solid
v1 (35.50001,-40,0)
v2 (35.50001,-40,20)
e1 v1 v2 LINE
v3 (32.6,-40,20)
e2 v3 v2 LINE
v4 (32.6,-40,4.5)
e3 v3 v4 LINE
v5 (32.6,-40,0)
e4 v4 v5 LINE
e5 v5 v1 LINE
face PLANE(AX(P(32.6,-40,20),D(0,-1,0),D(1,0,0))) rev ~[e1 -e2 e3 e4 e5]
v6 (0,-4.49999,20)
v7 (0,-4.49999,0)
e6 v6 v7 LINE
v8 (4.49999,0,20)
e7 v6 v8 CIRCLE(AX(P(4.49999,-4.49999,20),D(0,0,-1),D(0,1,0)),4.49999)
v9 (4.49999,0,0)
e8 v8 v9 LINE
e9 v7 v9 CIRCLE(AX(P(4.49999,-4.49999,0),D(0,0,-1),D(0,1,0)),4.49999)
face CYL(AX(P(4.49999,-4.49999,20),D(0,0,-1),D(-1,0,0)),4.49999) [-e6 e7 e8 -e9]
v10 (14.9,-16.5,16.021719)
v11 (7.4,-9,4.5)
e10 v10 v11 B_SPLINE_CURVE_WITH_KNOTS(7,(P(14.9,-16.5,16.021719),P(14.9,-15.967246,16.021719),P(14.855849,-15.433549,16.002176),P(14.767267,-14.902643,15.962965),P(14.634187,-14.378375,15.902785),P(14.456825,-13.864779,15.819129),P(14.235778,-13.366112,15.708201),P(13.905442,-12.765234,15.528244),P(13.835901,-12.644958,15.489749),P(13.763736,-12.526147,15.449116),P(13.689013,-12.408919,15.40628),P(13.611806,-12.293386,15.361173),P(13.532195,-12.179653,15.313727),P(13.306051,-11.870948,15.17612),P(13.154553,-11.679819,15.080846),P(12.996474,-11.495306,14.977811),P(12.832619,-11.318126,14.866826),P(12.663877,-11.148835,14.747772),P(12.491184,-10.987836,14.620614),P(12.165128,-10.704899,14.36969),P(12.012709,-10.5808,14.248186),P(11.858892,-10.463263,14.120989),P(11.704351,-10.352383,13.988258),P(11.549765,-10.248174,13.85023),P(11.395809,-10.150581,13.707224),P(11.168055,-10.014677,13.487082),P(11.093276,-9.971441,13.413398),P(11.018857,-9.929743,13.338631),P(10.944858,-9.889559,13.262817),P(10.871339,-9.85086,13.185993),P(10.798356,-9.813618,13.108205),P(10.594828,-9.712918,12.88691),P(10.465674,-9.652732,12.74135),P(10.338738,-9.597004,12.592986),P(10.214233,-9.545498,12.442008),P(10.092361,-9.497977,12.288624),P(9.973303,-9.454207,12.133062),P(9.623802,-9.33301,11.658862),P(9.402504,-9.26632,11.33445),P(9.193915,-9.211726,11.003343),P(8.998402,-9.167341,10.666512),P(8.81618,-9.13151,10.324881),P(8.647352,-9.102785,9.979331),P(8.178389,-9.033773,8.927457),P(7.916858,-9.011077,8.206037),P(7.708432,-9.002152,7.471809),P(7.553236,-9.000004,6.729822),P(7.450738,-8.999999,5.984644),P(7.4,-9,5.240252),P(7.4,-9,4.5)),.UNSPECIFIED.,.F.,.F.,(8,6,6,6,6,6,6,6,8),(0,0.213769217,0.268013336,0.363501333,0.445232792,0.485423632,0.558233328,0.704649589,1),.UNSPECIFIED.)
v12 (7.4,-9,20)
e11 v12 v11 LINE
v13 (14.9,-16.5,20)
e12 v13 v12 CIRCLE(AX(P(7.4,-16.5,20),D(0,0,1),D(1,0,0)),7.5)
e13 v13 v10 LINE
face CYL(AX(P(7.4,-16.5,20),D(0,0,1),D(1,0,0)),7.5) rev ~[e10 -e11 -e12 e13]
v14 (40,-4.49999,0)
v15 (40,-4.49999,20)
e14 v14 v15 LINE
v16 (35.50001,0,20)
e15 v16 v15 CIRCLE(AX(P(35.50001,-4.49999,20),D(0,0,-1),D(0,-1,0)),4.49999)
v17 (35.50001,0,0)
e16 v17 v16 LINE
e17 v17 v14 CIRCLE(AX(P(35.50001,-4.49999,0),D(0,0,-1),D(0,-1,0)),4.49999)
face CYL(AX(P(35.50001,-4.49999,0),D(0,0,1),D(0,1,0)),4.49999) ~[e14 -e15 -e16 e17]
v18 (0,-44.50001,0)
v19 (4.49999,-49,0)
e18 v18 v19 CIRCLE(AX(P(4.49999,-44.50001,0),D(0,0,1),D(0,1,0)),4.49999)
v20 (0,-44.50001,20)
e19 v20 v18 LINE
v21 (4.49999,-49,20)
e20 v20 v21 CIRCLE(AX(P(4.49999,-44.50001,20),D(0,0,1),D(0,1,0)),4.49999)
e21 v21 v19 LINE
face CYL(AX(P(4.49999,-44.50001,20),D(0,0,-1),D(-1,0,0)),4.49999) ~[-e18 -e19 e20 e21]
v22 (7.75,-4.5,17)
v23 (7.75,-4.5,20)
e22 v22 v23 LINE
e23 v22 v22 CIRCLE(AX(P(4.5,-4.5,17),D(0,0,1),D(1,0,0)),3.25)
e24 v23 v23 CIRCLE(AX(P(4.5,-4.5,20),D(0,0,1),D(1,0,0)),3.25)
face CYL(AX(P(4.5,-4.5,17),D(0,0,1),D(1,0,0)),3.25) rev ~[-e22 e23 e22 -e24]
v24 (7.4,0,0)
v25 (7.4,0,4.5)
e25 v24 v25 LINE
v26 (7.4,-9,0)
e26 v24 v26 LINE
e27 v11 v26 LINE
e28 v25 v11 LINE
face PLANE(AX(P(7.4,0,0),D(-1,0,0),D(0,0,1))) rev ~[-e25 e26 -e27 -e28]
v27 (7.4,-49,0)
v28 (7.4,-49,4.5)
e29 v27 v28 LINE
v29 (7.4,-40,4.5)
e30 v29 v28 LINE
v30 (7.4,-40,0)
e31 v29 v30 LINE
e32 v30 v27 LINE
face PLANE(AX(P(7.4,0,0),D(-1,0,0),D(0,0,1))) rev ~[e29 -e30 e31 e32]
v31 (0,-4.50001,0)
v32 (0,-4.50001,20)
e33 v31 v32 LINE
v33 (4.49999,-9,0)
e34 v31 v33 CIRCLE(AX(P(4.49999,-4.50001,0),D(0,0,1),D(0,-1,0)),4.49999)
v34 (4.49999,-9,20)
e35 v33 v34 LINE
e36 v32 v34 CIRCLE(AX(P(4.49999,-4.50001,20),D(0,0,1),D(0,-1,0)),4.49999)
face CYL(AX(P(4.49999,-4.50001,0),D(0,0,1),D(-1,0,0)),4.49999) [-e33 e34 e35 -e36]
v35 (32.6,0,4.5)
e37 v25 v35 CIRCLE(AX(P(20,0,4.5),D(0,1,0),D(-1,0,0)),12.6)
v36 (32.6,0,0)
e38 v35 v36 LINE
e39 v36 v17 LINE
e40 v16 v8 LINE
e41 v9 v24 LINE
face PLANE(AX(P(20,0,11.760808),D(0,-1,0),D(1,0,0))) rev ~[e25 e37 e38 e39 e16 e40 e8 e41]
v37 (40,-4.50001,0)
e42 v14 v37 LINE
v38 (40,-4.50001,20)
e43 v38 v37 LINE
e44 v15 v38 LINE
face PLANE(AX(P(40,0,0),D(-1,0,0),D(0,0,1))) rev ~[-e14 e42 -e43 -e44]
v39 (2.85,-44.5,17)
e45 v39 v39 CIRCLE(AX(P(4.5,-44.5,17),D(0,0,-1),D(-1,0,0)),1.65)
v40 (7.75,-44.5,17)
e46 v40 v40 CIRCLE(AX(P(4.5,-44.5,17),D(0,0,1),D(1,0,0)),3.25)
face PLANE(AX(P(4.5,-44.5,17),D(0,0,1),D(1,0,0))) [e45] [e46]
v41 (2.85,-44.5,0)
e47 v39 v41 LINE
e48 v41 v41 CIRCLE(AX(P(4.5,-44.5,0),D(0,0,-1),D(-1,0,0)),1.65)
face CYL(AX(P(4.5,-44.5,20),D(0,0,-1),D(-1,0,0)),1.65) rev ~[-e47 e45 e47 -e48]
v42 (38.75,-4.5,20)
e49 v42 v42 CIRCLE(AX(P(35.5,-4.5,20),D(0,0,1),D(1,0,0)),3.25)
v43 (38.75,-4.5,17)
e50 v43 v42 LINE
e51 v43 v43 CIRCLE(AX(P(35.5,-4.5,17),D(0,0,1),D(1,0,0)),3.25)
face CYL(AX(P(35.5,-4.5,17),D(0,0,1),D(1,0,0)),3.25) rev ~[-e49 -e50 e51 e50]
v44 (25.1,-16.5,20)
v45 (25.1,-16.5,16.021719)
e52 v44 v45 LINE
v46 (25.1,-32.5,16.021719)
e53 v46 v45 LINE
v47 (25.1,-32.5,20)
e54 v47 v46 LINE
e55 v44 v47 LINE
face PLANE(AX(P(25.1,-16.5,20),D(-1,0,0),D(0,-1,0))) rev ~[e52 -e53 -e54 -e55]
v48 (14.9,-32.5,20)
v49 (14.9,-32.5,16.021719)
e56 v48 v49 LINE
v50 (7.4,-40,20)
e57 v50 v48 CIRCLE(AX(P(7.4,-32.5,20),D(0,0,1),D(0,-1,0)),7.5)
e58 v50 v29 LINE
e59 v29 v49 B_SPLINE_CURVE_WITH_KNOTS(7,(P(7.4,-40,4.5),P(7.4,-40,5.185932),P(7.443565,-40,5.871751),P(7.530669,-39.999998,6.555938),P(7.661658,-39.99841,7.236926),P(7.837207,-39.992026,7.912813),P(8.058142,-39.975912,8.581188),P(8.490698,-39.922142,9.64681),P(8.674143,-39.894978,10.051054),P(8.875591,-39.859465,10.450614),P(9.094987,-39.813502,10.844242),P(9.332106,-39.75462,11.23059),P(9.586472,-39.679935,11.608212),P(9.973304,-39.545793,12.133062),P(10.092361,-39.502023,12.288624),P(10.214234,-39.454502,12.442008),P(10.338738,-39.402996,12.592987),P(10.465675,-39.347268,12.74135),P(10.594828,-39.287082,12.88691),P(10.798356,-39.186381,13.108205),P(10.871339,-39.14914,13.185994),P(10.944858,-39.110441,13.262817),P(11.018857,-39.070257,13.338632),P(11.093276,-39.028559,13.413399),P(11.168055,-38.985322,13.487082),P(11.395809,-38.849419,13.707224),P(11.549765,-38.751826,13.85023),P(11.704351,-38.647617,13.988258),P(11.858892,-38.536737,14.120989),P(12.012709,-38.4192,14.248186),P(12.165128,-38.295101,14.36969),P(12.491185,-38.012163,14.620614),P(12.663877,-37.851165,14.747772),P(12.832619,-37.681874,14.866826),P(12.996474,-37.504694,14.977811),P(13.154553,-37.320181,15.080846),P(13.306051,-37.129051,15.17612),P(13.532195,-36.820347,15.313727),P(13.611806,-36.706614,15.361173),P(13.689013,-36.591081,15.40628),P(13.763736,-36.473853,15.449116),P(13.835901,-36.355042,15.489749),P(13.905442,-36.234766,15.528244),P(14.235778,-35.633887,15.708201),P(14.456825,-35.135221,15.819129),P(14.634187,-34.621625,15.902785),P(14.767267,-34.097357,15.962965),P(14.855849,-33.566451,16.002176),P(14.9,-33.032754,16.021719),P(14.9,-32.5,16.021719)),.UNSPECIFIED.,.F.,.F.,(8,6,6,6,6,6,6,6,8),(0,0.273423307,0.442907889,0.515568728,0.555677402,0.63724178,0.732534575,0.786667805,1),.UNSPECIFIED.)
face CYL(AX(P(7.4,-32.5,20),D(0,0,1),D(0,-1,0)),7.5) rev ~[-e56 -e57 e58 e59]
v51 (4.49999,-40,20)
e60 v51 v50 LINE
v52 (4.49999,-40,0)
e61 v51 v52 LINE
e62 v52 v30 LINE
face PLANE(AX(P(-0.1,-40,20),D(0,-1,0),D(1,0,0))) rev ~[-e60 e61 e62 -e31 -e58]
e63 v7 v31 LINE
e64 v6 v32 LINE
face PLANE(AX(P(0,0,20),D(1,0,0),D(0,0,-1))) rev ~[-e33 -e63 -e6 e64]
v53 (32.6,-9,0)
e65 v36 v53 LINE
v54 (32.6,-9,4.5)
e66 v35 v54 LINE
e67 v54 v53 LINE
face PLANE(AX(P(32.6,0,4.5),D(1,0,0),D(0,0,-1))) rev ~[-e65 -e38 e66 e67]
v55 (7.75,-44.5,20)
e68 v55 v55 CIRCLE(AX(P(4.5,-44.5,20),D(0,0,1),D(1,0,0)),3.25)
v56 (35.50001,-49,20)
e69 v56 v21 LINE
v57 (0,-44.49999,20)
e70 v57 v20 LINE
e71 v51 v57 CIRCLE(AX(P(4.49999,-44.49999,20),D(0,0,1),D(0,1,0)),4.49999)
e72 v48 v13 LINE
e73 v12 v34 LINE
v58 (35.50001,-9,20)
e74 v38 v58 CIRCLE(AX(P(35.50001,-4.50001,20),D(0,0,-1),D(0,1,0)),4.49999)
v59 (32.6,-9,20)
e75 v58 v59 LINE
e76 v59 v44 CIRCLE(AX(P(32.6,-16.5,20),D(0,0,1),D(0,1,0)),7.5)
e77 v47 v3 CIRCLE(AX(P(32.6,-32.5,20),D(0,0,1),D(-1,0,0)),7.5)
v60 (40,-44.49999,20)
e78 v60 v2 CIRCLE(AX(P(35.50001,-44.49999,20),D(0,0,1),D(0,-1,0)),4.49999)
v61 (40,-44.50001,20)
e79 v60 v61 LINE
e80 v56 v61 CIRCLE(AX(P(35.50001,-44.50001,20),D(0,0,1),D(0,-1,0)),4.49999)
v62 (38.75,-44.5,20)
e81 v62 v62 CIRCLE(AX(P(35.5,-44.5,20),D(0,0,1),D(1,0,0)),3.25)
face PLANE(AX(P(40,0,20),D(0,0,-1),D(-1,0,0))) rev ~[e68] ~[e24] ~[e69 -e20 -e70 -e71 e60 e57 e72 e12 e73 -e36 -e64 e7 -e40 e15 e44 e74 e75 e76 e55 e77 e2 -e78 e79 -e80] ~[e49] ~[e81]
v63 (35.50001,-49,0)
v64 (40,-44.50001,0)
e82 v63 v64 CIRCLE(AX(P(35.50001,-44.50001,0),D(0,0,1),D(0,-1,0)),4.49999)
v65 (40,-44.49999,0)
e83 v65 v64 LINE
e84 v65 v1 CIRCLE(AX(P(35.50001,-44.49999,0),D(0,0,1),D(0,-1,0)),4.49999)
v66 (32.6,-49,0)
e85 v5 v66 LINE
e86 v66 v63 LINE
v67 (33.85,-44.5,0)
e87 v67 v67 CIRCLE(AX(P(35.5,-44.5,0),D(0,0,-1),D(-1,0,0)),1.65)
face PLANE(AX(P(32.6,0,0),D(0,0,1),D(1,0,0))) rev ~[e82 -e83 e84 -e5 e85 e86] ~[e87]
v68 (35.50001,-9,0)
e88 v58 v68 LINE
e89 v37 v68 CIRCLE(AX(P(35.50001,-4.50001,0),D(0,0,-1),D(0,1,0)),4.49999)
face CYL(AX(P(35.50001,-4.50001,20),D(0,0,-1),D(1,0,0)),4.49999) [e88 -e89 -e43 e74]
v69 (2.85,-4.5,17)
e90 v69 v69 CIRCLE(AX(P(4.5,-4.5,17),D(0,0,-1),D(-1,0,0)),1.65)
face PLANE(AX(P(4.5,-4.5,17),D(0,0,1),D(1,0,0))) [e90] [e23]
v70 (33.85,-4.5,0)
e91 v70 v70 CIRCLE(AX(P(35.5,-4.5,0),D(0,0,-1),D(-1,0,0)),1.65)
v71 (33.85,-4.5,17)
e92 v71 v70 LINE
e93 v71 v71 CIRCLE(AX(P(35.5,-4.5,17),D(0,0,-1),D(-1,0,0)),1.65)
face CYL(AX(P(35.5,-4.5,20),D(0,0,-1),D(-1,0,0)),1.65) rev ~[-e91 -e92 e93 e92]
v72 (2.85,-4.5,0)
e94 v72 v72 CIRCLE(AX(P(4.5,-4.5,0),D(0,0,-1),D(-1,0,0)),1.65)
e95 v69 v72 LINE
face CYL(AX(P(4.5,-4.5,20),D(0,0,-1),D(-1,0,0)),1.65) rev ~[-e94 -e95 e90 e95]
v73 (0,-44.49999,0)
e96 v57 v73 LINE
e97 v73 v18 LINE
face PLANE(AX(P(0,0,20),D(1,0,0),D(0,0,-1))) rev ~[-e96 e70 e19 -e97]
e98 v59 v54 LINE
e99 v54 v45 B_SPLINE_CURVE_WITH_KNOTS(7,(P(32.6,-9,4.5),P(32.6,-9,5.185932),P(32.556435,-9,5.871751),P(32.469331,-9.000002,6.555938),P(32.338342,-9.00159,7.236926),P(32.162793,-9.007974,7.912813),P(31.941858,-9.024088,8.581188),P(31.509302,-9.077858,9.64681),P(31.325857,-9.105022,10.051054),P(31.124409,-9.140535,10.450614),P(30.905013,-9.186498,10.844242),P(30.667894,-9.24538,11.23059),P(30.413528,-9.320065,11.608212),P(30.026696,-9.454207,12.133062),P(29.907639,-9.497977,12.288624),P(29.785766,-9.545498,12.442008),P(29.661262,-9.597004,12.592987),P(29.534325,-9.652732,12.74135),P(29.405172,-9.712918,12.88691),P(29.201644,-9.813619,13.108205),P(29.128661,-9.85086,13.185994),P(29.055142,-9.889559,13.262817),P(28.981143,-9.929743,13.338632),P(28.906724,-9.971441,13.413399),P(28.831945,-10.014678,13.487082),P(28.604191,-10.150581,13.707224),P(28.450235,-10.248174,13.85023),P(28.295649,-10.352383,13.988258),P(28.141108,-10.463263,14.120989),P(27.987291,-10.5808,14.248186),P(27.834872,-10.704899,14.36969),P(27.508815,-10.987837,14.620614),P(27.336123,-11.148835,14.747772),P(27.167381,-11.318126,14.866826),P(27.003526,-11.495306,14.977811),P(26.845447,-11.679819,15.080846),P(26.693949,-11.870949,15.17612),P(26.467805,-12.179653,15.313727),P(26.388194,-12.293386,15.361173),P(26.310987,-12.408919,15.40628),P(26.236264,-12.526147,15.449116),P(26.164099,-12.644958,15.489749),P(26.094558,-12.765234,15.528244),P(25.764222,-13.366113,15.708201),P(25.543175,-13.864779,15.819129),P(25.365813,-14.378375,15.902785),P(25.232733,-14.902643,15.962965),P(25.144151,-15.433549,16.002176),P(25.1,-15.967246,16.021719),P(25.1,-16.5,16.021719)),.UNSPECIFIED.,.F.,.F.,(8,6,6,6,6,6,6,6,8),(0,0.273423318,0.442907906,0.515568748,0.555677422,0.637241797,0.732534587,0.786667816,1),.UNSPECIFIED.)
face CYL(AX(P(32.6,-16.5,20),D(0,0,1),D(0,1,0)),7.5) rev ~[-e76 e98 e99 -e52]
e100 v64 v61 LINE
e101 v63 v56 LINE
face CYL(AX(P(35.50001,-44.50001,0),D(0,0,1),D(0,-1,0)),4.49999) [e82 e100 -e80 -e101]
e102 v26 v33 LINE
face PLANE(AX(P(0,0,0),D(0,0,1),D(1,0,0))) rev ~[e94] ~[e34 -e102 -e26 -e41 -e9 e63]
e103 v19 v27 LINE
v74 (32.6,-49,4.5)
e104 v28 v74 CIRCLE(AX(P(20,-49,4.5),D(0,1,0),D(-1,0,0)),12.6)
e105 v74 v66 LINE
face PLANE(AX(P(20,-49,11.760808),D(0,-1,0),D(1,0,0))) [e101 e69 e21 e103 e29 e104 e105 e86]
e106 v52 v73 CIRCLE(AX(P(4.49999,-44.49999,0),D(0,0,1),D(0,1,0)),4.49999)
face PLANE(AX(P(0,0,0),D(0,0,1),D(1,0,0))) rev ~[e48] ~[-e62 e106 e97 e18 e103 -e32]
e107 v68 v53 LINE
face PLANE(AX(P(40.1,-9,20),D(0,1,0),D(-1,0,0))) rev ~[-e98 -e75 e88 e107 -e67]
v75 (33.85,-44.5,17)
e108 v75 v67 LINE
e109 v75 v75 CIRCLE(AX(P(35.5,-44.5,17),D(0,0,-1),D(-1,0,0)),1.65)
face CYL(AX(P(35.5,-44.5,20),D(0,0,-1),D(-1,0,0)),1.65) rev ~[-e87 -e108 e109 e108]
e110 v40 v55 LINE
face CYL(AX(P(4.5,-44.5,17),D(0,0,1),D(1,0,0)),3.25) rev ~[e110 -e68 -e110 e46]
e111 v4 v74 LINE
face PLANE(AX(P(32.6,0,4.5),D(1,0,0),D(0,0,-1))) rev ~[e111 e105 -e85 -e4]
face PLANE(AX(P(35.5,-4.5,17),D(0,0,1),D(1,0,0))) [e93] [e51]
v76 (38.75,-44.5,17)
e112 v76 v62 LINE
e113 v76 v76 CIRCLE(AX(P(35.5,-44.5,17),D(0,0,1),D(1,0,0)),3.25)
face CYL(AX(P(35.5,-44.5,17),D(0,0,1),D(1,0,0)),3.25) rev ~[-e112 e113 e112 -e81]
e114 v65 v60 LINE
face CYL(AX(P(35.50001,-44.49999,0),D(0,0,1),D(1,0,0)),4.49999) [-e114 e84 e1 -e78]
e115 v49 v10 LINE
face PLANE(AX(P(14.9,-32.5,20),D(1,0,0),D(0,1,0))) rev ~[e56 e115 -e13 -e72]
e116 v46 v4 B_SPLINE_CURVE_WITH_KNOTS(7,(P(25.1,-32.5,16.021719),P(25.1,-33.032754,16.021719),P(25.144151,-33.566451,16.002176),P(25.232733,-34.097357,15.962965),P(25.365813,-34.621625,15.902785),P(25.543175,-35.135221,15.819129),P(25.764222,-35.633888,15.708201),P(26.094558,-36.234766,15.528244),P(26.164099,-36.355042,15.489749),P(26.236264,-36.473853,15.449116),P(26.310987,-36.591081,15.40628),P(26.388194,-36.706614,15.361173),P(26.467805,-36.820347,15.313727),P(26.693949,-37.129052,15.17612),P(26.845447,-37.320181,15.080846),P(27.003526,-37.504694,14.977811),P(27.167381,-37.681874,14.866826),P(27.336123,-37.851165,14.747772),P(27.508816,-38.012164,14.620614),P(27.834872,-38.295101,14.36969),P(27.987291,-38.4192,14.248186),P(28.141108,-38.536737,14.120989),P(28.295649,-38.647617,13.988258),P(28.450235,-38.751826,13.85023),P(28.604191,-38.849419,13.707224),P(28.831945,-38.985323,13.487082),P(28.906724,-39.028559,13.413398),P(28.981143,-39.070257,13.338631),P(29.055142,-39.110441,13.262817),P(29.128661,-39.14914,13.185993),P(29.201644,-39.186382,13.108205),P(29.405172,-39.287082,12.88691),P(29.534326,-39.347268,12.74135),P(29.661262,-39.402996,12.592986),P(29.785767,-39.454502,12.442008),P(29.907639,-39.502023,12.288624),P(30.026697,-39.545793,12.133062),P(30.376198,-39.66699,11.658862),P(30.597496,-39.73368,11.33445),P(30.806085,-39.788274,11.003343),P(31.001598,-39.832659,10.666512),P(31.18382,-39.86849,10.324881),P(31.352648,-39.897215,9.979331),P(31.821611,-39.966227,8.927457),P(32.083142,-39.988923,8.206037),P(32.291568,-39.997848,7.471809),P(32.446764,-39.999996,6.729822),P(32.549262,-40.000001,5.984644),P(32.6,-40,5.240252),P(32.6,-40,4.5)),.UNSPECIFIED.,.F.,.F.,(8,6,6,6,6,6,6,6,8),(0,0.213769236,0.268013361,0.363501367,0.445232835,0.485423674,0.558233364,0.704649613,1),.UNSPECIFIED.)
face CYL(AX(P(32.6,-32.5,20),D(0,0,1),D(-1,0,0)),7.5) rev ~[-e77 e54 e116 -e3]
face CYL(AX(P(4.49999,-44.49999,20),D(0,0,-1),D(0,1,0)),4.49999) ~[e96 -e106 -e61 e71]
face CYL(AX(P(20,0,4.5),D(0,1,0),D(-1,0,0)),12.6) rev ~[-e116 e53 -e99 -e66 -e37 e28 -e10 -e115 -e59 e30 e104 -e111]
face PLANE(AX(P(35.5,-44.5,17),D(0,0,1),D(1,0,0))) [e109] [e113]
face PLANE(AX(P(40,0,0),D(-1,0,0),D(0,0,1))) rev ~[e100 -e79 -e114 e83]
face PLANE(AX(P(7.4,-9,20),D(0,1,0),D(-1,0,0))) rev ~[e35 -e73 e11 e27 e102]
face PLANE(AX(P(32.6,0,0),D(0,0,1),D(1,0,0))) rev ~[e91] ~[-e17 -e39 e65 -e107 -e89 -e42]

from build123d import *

# Parameters (mm, degrees)
F1_DEPTH       = 49
F3_D           = 3.3
F3_DEPTH       = 30
F3_CBORE_D     = 6.5
F3_CBORE_DEPTH = 3
F3_TIP         = 0.9914200214
F5_DEPTH       = 25
F6_R           = 4.49999


# Not quite as in the source:
# - a fillet or chamfer is up to 0.001 mm smaller than in the source, because OpenCascade refuses the exact size


with BuildPart() as f1:
    # F0 (on Front) → F1 (new body)
    with BuildSketch(Plane.XZ):
        with BuildLine():
            Line((0, 20), (0, 0))
            Line((0, 0), (7.4, 0))
            Line((7.4, 0), (7.4, 4.5))
            ThreePointArc((7.4, 4.5), (20, 17.1), (32.6, 4.5))
            Line((32.6, 4.5), (32.6, 0))
            Line((32.6, 0), (40, 0))
            Line((40, 0), (40, 20))
            Line((40, 20), (0, 20))
        make_face()
    extrude(amount=F1_DEPTH)

    # F3
    with Locations(Plane.XY.offset(20)):
        with Locations((4.5, -4.5), (4.5, -44.5), (35.5, -44.5), (35.5, -4.5)):
            CounterBoreHole(F3_D / 2, F3_CBORE_D / 2, F3_CBORE_DEPTH, depth=F3_DEPTH)
            with Locations((0, 0, -(F3_DEPTH + F3_TIP / 2))):  # 118° drill point
                Cone(0, F3_D / 2, F3_TIP, mode=Mode.SUBTRACT)

    # F4 (on face) → F5 (cut)
    with BuildSketch(Plane.XY.offset(20)):
        with BuildLine():
            Line((14.9, -32.5), (14.9, -16.5))
            ThreePointArc((14.9, -16.5), (12.7033008589, -11.1966991411), (7.4, -9))
            Line((7.4, -9), (-0.1, -9))
            Line((-0.1, -9), (-0.1, -40))
            Line((-0.1, -40), (7.4, -40))
            ThreePointArc((7.4, -40), (12.7033008589, -37.8033008589), (14.9, -32.5))
        make_face()
        with BuildLine():
            ThreePointArc((32.6, -9), (27.2966991411, -11.1966991411), (25.1, -16.5))
            Line((25.1, -16.5), (25.1, -32.5))
            ThreePointArc((25.1, -32.5), (27.2966991411, -37.8033008589), (32.6, -40))
            Line((32.6, -40), (40.1, -40))
            Line((40.1, -40), (40.1, -9))
            Line((40.1, -9), (32.6, -9))
        make_face()
    extrude(amount=-F5_DEPTH, mode=Mode.SUBTRACT)

    # F6 (radius 4.5 in the source; OpenCascade refuses exactly that, so slightly less here)
    f6_edges = [f1.edges().sort_by_distance(p)[0] for p in [
        (40, -49, 10),
        (0, -49, 10),
        (40, 0, 10),
        (0, 0, 10),
        (40, -9, 10),
        (40, -40, 10),
        (0, -40, 10),
        (0, -9, 10),
    ]]
    fillet(f6_edges, radius=F6_R)


solid = f1.part
